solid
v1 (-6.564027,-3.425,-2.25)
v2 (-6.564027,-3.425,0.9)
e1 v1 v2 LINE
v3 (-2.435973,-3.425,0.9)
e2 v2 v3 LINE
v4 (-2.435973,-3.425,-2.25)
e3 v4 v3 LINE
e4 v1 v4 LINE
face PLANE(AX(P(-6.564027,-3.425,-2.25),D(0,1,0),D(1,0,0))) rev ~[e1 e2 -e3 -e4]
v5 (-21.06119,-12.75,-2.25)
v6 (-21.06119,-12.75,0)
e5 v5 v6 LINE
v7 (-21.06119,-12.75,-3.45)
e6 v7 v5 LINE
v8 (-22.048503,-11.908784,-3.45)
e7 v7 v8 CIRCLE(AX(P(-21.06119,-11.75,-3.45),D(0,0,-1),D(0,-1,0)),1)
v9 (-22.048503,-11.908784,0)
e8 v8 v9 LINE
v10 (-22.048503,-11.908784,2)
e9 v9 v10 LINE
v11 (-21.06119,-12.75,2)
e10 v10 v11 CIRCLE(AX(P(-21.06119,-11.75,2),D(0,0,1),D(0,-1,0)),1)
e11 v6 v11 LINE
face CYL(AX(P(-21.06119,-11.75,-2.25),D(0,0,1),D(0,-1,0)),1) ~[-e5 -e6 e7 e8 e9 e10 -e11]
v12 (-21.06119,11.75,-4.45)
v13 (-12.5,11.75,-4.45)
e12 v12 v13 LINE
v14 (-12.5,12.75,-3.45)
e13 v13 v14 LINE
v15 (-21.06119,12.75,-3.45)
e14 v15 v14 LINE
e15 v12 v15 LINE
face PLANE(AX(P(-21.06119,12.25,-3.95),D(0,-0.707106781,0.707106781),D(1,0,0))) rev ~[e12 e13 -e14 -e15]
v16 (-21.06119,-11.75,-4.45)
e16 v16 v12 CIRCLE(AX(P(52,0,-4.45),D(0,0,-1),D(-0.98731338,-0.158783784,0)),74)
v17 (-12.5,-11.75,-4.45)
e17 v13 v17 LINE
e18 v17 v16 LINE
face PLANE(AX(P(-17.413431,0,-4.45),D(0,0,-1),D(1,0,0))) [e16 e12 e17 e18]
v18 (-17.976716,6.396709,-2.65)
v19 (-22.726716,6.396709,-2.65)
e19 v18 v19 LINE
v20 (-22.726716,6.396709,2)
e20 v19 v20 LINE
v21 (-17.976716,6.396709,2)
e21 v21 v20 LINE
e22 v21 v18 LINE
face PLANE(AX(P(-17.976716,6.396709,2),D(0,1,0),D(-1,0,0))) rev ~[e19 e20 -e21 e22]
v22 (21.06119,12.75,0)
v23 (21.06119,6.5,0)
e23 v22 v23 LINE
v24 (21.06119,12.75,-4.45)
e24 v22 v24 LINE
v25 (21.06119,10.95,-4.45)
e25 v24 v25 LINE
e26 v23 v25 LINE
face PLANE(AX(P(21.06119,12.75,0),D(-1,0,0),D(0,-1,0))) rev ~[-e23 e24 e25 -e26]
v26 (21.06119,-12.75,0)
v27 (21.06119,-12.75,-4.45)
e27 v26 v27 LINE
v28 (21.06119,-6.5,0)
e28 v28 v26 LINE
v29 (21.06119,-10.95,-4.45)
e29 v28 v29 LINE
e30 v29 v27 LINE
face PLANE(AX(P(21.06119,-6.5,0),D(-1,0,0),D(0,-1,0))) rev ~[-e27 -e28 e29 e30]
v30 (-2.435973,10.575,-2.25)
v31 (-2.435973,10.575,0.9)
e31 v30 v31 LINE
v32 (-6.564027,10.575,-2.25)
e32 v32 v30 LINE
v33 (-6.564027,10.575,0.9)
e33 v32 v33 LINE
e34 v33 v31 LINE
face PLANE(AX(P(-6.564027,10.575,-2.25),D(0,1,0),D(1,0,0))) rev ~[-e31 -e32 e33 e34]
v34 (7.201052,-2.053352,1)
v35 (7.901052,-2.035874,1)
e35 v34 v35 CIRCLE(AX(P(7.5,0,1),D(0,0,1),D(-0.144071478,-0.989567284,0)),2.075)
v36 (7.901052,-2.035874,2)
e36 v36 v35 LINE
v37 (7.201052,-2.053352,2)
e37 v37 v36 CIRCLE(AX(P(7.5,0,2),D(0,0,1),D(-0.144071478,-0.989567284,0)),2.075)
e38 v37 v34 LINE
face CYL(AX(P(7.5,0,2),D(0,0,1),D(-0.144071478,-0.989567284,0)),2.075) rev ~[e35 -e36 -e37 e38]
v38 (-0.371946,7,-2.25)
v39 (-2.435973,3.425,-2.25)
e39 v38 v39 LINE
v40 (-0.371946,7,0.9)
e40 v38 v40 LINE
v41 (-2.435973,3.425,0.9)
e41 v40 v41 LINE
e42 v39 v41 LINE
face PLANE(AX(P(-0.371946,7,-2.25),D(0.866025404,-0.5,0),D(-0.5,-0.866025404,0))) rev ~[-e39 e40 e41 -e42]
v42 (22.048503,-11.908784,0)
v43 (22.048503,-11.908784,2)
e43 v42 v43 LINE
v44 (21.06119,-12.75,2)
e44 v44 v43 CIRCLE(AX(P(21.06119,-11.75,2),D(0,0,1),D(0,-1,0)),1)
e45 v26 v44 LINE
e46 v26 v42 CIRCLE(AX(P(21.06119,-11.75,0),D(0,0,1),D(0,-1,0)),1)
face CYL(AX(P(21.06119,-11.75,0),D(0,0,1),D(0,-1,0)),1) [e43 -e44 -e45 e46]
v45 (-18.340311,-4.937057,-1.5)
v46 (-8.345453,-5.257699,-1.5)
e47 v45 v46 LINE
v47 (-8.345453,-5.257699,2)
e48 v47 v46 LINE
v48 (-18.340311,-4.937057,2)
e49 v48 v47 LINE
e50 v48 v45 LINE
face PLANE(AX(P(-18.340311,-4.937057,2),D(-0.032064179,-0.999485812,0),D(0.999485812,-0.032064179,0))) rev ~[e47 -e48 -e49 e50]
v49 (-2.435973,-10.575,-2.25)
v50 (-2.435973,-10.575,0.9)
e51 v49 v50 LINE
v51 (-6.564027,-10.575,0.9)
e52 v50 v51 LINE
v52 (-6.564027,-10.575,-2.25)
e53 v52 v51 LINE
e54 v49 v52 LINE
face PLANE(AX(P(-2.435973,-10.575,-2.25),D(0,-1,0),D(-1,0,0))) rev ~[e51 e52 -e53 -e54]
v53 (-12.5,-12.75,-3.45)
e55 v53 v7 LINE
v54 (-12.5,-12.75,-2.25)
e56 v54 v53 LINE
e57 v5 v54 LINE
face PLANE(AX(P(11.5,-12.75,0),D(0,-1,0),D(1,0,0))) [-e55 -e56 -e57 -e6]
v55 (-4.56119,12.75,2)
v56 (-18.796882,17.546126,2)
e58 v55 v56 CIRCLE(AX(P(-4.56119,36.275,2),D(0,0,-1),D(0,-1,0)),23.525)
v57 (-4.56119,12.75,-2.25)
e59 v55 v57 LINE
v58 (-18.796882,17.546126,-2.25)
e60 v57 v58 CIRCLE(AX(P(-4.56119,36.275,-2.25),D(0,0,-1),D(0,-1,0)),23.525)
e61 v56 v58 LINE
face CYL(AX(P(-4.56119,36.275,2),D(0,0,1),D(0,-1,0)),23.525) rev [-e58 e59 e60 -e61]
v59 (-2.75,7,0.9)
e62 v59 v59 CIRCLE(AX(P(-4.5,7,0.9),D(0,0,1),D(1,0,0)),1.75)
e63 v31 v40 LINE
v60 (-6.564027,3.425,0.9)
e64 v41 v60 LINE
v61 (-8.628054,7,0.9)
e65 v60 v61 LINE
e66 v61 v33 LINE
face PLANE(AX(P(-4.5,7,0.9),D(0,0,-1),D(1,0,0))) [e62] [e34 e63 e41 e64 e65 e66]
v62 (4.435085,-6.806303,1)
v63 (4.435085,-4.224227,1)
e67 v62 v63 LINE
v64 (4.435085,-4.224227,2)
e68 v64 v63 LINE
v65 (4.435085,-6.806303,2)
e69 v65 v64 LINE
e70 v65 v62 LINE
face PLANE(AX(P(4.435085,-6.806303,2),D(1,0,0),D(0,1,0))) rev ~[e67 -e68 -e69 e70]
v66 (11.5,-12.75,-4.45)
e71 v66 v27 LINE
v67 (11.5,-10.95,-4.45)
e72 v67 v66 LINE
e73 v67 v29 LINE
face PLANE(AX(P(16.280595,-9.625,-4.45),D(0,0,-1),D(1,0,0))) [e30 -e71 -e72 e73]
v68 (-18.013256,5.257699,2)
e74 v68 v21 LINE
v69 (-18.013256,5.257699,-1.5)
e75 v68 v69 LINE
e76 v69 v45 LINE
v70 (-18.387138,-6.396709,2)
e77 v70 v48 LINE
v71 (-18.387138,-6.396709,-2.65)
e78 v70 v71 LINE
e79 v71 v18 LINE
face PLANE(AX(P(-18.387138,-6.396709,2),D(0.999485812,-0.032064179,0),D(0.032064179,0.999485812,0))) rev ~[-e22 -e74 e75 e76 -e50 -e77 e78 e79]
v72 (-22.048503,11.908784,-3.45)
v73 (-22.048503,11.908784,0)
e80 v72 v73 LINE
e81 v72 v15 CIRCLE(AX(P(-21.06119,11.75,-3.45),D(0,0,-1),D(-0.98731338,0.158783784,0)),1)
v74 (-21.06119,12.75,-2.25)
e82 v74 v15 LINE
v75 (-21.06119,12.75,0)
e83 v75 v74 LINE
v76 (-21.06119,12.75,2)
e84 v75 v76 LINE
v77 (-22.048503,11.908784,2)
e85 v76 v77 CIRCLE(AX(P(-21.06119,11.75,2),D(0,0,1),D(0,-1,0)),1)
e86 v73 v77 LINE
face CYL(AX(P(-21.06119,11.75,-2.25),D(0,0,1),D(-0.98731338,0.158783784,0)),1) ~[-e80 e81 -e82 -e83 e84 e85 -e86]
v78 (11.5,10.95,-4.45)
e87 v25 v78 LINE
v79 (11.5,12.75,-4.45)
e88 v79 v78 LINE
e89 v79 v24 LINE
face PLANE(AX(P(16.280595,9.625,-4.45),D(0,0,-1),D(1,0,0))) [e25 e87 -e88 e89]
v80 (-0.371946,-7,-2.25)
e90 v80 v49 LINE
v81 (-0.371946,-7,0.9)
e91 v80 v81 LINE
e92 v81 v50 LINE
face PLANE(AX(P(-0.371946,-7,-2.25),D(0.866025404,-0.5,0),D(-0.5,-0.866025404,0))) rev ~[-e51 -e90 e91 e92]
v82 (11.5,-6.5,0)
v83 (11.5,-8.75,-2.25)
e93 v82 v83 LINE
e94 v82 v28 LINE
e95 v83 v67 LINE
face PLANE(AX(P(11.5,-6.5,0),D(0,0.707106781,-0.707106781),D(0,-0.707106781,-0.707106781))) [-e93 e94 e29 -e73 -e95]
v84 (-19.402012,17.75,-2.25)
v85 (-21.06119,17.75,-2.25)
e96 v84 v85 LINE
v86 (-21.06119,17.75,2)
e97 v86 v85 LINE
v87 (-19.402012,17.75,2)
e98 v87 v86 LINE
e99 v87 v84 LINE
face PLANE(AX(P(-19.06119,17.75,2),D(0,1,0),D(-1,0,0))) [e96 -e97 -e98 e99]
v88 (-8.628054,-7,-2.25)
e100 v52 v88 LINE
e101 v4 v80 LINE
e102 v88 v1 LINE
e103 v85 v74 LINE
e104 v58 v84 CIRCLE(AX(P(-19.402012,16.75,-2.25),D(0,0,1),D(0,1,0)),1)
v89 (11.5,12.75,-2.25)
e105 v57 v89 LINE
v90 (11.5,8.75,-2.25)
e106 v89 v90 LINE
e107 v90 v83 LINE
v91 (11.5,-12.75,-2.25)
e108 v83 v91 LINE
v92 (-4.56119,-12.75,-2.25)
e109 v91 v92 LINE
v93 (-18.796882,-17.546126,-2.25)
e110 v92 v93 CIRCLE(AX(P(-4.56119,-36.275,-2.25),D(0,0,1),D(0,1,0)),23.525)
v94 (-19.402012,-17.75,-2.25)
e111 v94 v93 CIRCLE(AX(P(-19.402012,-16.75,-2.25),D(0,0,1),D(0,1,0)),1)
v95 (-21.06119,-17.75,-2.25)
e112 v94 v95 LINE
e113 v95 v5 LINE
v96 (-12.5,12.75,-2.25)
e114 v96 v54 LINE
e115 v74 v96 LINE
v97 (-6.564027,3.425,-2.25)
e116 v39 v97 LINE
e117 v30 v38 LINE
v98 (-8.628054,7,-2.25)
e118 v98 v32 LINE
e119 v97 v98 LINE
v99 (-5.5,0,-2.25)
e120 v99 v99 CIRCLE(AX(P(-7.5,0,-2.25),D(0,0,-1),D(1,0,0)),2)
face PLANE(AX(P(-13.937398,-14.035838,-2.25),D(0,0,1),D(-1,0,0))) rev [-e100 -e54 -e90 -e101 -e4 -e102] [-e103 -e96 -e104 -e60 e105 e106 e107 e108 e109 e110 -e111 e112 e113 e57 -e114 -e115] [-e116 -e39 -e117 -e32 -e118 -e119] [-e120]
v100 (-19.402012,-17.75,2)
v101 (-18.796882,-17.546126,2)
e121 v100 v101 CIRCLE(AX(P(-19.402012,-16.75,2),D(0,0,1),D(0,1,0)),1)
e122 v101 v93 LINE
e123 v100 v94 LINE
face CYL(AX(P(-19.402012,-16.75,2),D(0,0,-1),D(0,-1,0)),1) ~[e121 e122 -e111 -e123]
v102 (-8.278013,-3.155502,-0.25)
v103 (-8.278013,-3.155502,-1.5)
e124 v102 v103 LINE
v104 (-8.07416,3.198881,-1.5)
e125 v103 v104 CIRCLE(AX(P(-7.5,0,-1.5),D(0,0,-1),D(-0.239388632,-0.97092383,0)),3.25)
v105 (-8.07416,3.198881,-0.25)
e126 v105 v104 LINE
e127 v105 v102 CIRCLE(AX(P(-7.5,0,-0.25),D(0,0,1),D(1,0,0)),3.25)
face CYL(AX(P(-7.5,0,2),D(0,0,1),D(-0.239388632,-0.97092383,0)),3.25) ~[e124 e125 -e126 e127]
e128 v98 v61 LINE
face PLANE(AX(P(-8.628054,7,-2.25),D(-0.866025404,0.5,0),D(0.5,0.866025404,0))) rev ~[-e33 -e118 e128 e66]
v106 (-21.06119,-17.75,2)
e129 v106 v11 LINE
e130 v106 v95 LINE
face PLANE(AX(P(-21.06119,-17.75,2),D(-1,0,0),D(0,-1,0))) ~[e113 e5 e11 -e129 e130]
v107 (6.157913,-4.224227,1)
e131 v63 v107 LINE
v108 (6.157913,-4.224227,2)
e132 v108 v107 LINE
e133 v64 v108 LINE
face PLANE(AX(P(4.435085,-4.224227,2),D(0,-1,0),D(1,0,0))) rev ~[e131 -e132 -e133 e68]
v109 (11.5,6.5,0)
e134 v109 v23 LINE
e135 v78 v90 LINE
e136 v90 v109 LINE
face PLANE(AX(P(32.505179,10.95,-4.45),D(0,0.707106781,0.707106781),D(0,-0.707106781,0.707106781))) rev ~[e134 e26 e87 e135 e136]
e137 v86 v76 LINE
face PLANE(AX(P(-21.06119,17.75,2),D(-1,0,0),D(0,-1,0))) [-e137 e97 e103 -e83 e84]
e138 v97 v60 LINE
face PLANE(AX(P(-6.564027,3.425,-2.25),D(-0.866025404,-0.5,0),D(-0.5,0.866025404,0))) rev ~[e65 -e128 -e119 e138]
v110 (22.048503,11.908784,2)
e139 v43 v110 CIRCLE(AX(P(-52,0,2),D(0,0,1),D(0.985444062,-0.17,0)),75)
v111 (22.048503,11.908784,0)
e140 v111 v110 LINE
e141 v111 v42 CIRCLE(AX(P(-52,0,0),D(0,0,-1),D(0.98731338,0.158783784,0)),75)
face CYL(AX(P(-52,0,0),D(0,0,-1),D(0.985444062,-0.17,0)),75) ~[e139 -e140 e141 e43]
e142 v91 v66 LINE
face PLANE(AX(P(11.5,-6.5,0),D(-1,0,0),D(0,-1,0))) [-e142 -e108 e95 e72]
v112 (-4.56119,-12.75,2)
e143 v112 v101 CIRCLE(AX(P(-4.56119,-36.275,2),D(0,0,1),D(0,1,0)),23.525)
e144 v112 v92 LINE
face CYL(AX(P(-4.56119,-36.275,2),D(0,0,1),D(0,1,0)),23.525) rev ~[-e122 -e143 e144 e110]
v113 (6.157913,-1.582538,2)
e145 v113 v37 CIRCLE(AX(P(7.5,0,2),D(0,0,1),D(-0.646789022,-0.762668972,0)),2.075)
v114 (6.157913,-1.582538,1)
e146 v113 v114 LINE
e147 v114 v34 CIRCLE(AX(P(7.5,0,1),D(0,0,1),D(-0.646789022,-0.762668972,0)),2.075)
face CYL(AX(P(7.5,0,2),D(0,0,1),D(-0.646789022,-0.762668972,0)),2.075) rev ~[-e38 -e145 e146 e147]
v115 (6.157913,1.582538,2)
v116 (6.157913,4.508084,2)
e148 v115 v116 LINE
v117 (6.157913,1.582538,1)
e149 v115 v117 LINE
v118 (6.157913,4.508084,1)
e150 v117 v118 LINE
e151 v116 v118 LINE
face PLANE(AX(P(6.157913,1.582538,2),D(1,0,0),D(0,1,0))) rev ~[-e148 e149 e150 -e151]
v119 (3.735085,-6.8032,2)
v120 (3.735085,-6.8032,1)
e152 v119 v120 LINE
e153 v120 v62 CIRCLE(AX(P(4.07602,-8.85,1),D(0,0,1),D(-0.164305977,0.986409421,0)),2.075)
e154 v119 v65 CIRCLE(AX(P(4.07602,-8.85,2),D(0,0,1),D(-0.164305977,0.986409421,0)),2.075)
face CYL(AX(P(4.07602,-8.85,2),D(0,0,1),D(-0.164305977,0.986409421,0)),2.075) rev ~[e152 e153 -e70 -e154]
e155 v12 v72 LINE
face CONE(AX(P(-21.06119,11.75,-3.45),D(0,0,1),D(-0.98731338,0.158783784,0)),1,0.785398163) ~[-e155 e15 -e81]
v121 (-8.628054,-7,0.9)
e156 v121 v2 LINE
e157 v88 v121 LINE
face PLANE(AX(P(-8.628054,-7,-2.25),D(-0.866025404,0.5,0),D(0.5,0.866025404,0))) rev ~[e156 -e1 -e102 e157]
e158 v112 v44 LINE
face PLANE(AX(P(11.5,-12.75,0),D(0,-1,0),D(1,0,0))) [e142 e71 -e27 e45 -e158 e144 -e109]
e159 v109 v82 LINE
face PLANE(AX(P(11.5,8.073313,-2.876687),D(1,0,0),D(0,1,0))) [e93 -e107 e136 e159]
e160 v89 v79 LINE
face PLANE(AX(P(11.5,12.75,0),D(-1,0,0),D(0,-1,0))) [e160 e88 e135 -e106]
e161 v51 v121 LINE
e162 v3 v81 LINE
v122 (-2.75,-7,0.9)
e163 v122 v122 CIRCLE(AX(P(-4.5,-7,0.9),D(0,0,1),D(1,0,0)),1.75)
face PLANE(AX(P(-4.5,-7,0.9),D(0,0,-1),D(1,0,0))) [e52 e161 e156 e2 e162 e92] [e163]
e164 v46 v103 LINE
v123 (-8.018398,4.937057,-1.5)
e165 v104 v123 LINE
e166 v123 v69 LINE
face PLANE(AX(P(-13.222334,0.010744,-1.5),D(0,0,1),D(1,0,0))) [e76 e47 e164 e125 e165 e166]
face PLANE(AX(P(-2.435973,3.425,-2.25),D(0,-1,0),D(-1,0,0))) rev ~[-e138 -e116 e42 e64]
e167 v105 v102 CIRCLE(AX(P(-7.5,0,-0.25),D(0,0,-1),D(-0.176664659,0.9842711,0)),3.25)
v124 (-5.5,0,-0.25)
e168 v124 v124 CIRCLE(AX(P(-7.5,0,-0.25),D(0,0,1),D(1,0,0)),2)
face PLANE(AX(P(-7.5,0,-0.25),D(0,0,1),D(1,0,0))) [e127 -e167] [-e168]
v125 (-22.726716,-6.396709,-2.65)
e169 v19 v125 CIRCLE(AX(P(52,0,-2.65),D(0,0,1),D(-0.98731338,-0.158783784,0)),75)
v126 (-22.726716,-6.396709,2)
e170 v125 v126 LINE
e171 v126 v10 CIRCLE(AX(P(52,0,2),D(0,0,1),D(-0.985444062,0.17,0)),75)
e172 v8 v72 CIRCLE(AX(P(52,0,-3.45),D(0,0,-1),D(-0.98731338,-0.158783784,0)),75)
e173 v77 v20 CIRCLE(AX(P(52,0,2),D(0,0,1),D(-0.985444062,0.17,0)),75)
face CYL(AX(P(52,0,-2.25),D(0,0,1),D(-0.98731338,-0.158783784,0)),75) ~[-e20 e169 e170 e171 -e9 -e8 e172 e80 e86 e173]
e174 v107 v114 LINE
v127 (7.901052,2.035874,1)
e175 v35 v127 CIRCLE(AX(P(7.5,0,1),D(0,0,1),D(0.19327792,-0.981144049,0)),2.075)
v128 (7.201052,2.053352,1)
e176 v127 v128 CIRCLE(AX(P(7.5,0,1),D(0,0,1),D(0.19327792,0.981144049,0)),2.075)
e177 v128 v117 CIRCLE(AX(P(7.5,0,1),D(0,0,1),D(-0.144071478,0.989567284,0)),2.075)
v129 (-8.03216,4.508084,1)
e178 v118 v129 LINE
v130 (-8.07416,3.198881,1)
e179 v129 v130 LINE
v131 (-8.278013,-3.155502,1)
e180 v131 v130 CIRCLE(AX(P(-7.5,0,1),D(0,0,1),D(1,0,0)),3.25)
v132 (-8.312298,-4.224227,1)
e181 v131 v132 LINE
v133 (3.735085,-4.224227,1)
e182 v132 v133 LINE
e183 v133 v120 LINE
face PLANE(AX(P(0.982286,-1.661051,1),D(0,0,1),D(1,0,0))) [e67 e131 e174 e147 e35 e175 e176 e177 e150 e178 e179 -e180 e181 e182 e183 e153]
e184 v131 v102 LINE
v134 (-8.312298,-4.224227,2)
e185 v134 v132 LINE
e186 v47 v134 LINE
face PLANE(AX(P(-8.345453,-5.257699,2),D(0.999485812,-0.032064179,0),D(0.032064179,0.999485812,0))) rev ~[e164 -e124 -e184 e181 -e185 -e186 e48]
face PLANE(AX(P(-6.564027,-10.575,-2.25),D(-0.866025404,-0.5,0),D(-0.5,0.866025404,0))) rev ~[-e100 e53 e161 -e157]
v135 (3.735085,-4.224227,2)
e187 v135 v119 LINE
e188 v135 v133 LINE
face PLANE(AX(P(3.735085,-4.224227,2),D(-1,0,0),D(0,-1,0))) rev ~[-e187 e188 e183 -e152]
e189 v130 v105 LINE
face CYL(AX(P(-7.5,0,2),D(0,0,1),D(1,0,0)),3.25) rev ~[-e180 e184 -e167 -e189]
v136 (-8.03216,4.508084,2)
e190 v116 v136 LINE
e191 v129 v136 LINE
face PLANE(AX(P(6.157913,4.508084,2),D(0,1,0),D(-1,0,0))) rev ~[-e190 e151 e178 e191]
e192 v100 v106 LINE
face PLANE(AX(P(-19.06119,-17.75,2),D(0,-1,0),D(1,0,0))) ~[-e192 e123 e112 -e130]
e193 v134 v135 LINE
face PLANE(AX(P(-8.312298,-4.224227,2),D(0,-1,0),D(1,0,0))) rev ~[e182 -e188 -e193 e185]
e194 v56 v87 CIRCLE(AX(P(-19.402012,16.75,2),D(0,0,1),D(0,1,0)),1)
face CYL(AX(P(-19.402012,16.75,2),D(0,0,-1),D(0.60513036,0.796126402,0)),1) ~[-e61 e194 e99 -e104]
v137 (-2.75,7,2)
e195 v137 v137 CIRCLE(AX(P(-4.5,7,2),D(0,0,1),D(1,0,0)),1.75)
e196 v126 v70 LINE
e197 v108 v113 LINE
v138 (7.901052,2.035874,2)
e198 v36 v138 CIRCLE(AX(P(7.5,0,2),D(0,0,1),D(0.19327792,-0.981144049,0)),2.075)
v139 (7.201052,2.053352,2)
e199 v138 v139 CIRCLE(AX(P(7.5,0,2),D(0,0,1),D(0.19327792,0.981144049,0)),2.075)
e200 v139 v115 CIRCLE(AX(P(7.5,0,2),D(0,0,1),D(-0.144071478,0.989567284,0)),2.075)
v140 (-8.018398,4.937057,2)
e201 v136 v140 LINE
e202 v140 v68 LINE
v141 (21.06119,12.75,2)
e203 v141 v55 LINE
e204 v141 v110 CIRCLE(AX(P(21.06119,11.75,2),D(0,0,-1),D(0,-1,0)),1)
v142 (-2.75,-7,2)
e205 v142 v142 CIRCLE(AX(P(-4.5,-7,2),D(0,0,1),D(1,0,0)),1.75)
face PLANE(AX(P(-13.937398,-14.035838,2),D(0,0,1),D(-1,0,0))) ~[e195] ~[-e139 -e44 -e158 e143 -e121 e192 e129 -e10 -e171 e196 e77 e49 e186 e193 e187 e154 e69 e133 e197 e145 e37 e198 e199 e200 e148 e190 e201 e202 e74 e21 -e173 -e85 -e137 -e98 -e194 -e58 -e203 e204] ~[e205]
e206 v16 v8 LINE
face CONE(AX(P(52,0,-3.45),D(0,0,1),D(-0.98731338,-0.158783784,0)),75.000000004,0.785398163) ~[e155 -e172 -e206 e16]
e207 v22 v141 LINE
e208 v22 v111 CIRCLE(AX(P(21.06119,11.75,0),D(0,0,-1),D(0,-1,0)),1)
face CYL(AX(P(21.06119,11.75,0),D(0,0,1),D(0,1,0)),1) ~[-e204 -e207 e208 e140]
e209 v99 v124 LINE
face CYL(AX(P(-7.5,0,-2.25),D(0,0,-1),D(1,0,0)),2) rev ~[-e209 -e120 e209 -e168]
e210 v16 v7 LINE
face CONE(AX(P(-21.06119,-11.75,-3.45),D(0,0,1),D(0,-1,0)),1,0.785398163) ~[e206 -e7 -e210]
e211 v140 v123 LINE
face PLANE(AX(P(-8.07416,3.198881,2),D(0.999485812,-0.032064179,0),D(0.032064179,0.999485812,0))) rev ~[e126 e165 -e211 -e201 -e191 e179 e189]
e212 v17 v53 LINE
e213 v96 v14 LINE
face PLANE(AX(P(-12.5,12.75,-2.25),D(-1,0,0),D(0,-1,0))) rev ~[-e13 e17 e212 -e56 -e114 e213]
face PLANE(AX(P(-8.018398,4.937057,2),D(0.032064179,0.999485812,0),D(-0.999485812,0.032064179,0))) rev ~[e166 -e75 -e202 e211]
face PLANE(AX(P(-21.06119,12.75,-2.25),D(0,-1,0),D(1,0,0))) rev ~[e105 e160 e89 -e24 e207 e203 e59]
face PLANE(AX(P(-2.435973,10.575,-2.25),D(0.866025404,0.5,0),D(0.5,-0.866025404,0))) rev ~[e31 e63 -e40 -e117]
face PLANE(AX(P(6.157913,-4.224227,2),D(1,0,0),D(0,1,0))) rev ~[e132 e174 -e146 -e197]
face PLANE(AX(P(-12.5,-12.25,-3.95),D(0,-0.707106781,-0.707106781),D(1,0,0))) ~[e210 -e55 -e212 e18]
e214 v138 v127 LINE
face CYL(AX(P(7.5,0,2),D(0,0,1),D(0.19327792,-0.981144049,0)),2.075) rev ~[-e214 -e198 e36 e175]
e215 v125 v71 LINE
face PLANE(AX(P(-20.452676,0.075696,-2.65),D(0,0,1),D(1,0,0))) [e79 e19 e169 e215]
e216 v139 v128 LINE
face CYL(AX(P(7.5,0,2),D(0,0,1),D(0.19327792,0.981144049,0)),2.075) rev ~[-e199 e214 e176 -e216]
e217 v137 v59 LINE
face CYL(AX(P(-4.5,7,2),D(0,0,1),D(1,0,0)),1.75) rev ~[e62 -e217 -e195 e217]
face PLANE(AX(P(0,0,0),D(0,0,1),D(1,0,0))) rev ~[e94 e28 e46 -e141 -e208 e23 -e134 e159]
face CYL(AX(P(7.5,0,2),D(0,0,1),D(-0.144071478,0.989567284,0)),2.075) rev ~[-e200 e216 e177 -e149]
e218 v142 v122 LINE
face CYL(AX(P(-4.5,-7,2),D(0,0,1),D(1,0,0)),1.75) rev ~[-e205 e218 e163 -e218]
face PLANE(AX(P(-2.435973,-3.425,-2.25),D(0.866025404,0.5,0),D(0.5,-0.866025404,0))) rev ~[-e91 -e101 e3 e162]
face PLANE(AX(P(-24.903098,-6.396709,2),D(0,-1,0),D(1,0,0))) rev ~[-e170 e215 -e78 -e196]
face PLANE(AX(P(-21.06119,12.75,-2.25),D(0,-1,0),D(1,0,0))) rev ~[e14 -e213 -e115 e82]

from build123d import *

# Parameters (mm, degrees)
F1_DEPTH     = 2
F2_R         = 1
F4_DEPTH     = 2.25
F6_DEPTH     = 2.2
F7_R         = 2
F8_DEPTH     = 25
F9_R         = 3.25
F9_R_2       = 2
F10_DEPTH    = 2.25
F12_DEPTH    = 4.65
F14_DEPTH    = 3.5
F16_DEPTH    = 1
F17_R        = 1.75
F18_DEPTH    = 25
F20_DEPTH    = 3.15
F21_W        = 9.561190108
F21_H        = 6.25
F22_DEPTH    = 4.45
F23_T4_DEPTH = 21.0051794045
F23_T9_DEPTH = 21.0051794045
F24_SIZE     = 1
F26_DEPTH    = 4.25
F27_R        = 1


# Not quite as in the source:
# - a fillet or chamfer that OpenCascade refuses, or shapes differently, is made with other operations: its cross-section is extruded or revolved along the edge and cut away or added
# - a pattern or mirror of a feature is missing from the dataset's text; its kind, count and spacing are read off the source's solid


with BuildPart() as f1:
    # F0 (on Top) → F1 (new body)
    with BuildSketch(Plane.XY):
        with BuildLine():
            Line((21.9083046755, 12.75), (-21.9083046755, 12.75))
            ThreePointArc((-21.9083046755, 12.75), (-23, 0), (-21.9083046755, -12.75))
            Line((-21.9083046755, -12.75), (21.9083046755, -12.75))
            ThreePointArc((21.9083046755, -12.75), (23, 0), (21.9083046755, 12.75))
        make_face()
    extrude(amount=F1_DEPTH)

    # F2
    f2_edges = [f1.edges().sort_by_distance(p)[0] for p in [
        (-21.908305, 12.75, 1),
        (21.908305, 12.75, 1),
        (-21.908305, -12.75, 1),
        (21.908305, -12.75, 1),
    ]]
    fillet(f2_edges, radius=F2_R)

    # F3 (on face) → F4 (join)
    with BuildSketch(Plane(origin=(0, 0, 0), x_dir=(1, 0, 0), z_dir=(0, 0, -1))):
        with BuildLine():
            Line((11.5, 12.75), (-21.061190108, 12.75))
            ThreePointArc((-21.061190108, 12.75), (-21.7097331737, 12.5111779634), (-22.0485034879, 11.9087837838))
            ThreePointArc((-22.0485034879, 11.9087837838), (-23, 0), (-22.0485034879, -11.9087837838))
            ThreePointArc((-22.0485034879, -11.9087837838), (-21.7097331737, -12.5111779634), (-21.061190108, -12.75))
            Line((-21.061190108, -12.75), (11.5, -12.75))
            Line((11.5, -12.75), (11.5, 12.75))
        make_face()
    extrude(amount=F4_DEPTH)

    # F5 (on face) → F6 (join)
    with BuildSketch(Plane(origin=(0, 0, -2.25), x_dir=(1, 0, 0), z_dir=(0, 0, -1))):
        with BuildLine():
            ThreePointArc((-22.0485034879, -11.9087837838), (-21.7097331737, -12.5111779634), (-21.061190108, -12.75))
            Line((-21.061190108, -12.75), (-12.5, -12.75))
            Line((-12.5, -12.75), (-12.5, 12.75))
            Line((-12.5, 12.75), (-21.061190108, 12.75))
            ThreePointArc((-21.061190108, 12.75), (-21.7097331737, 12.5111779634), (-22.0485034879, 11.9087837838))
            ThreePointArc((-22.0485034879, 11.9087837838), (-23, 0), (-22.0485034879, -11.9087837838))
        make_face()
    extrude(amount=F6_DEPTH)

    # F7 (on face) → F8 (cut)
    with BuildSketch(Plane(origin=(0, 0, -2.25), x_dir=(1, 0, 0), z_dir=(0, 0, -1))):
        with Locations((-7.5, 0)):
            Circle(F7_R)
    extrude(amount=-F8_DEPTH, mode=Mode.SUBTRACT)

    # F9 (on face) → F10 (cut)
    with BuildSketch(Plane.XY.offset(2)):
        with Locations((-7.5, 0)):
            Circle(F9_R)
        with Locations((-7.5, 0)):
            Circle(F9_R_2, mode=Mode.SUBTRACT)
    extrude(amount=-F10_DEPTH, mode=Mode.SUBTRACT)

    # F11 (on face) → F12 (cut)
    with BuildSketch(Plane.XY.offset(2)):
        Polygon((-17.9767161827, 6.3967091968), (-22.7267161827, 6.3967091968), (-22.7267161827, -6.3967091968), (-18.3871376794, -6.3967091968), align=None)
        with BuildLine():
            ThreePointArc((-22.7267161827, -6.3967091968), (-23, 0), (-22.7267161827, 6.3967091968))
            Line((-22.7267161827, 6.3967091968), (-24.9030976, 6.3967091968))
            Line((-24.9030976, 6.3967091968), (-24.9030976, -6.3967091968))
            Line((-24.9030976, -6.3967091968), (-23.1371376794, -6.3967091968))
            Line((-23.1371376794, -6.3967091968), (-22.7267161827, -6.3967091968))
        make_face()
        Polygon((-22.7267161827, -6.3967091968), (-22.7267161827, 6.3967091968), (-24.9030976, 6.3967091968), (-24.9030976, -6.3967091968), (-23.1371376794, -6.3967091968), align=None)
    extrude(amount=-F12_DEPTH, mode=Mode.SUBTRACT)

    # F13 (on face) → F14 (cut)
    with BuildSketch(Plane.XY.offset(2)):
        with BuildLine():
            Line((-8.0183982933, 4.9370567441), (-18.0132564134, 5.2576985384))
            Line((-18.0132564134, 5.2576985384), (-18.3403110436, -4.9370567441))
            Line((-18.3403110436, -4.9370567441), (-8.3454529235, -5.2576985384))
            Line((-8.3454529235, -5.2576985384), (-8.2780130541, -3.1555024462))
            ThreePointArc((-8.2780130541, -3.1555024462), (-10.748328889, 0.1042085831), (-8.074160142, 3.1988810749))
            Line((-8.074160142, 3.1988810749), (-8.0183982933, 4.9370567441))
        make_face()
    extrude(amount=-F14_DEPTH, mode=Mode.SUBTRACT)

    # F15 (on face) → F16 (cut)
    with BuildSketch(Plane.XY.offset(2)):
        with BuildLine():
            ThreePointArc((7.2010516835, -2.053352114), (7.5517942695, -2.0743534785), (7.9010516835, -2.0358739026))
            ThreePointArc((7.9010516835, -2.0358739026), (9.575, 0), (7.9010516835, 2.0358739026))
            ThreePointArc((7.9010516835, 2.0358739026), (7.5517942695, 2.0743534785), (7.2010516835, 2.053352114))
            ThreePointArc((7.2010516835, 2.053352114), (6.646380727, 1.8912850491), (6.1579127796, 1.5825381173))
            Line((6.1579127796, 1.5825381173), (6.1579127796, 4.5080841794))
            Line((6.1579127796, 4.5080841794), (-8.312298453, 4.5080841794))
            Line((-8.312298453, 4.5080841794), (-8.312298453, -4.22422681))
            Line((-8.312298453, -4.22422681), (3.735084728, -4.22422681))
            Line((3.735084728, -4.22422681), (3.735084728, -6.8032004514))
            ThreePointArc((3.735084728, -6.8032004514), (4.0668227554, -10.9249796186), (4.435084728, -6.8063030421))
            Line((4.435084728, -6.8063030421), (4.435084728, -4.22422681))
            Line((4.435084728, -4.22422681), (6.1579127796, -4.22422681))
            Line((6.1579127796, -4.22422681), (6.1579127796, -1.5825381173))
            ThreePointArc((6.1579127796, -1.5825381173), (6.646380727, -1.8912850491), (7.2010516835, -2.053352114))
        make_face()
    extrude(amount=-F16_DEPTH, mode=Mode.SUBTRACT)

    # F17 (on face) → F18 (cut)
    with BuildSketch(Plane.XY.offset(2)):
        with Locations((-4.5, 7)):
            Circle(F17_R)
        with Locations((-4.5, -7)):
            Circle(F17_R)
    extrude(amount=-F18_DEPTH, mode=Mode.SUBTRACT)

    # F19 (on face) → F20 (cut)
    with BuildSketch(Plane(origin=(0, 0, -2.25), x_dir=(1, 0, 0), z_dir=(0, 0, -1))):
        Polygon((-2.4359727876, 10.575), (-6.5640272124, 10.575), (-8.6280544247, 7), (-6.5640272124, 3.425), (-2.4359727876, 3.425), (-0.3719455753, 7), align=None)
        Polygon((-2.4359727876, -3.425), (-6.5640272124, -3.425), (-8.6280544247, -7), (-6.5640272124, -10.575), (-2.4359727876, -10.575), (-0.3719455753, -7), align=None)
    extrude(amount=-F20_DEPTH, mode=Mode.SUBTRACT)

    # F21 (on face) → F22 (join, through all)
    with BuildSketch(Plane(origin=(0, 0, 0), x_dir=(1, 0, 0), z_dir=(0, 0, -1))):
        with Locations((16.280595054, 9.625)):
            Rectangle(F21_W, F21_H)
        with Locations((16.280595054, -9.625)):
            Rectangle(F21_W, F21_H)
    extrude(amount=F22_DEPTH)

    # F23: chamfer of 4.45 on 2 edges, made by hand


with BuildPart() as f23_tool2:
    # F23_s3 → F23_t4 (new body)
    with BuildSketch(Plane.YZ.offset(11.5)):
        Polygon((-6.5, 0), (-10.95, -4.45), (-6.5, -4.45), align=None)
    extrude(amount=F23_T4_DEPTH)

    split(bisect_by=Plane.XY, keep=Keep.BOTTOM)


with BuildPart() as f1_1:
    add(f1.part)

    # F23_t1: cut F23_tool2
    add(f23_tool2.part, mode=Mode.SUBTRACT)


with BuildPart() as f23_tool7:
    # F23_s8 → F23_t9 (new body)
    with BuildSketch(Plane.YZ.offset(32.5051794045)):
        Polygon((10.95, -4.45), (6.5, 0), (6.5, -4.45), align=None)
    extrude(amount=-F23_T9_DEPTH)

    split(bisect_by=Plane.XY, keep=Keep.BOTTOM)


with BuildPart() as f1_2:
    add(f1_1.part)

    # F23_t6: cut F23_tool7
    add(f23_tool7.part, mode=Mode.SUBTRACT)

    # F24
    f24_edges = [f1_2.edges().sort_by_distance(p)[0] for p in [
        (-16.780595, -12.75, -4.45),
        (-16.780595, 12.75, -4.45),
        (-21.709733, -12.511178, -4.45),
        (-23, 0, -4.45),
        (-21.709733, 12.511178, -4.45),
    ]]
    chamfer(f24_edges, length=F24_SIZE)

    # F25 (on face) → F26 (join, through all)
    with BuildSketch(Plane.XY.offset(2)):
        with BuildLine():
            Line((-21.061190108, 17.75), (-21.061190108, 12.75))
            Line((-21.061190108, 12.75), (-4.561190108, 12.75))
            ThreePointArc((-4.561190108, 12.75), (-12.2301209331, 14.0351006072), (-19.061190108, 17.75))
            Line((-19.061190108, 17.75), (-21.061190108, 17.75))
        make_face()
    f26 = extrude(amount=-F26_DEPTH)

    # F26_copies: F26 across plane
    add(f26.mirror(Plane(origin=(0, 0, 0), x_dir=(0, 0, -1), z_dir=(0, -1, 0))))

    # F27
    f27_edges = [f1_2.edges().sort_by_distance(p)[0] for p in [
        (-19.06119, 17.75, -0.125),
        (-19.06119, -17.75, -0.125),
    ]]
    fillet(f27_edges, radius=F27_R)


solid = f1_2.part
